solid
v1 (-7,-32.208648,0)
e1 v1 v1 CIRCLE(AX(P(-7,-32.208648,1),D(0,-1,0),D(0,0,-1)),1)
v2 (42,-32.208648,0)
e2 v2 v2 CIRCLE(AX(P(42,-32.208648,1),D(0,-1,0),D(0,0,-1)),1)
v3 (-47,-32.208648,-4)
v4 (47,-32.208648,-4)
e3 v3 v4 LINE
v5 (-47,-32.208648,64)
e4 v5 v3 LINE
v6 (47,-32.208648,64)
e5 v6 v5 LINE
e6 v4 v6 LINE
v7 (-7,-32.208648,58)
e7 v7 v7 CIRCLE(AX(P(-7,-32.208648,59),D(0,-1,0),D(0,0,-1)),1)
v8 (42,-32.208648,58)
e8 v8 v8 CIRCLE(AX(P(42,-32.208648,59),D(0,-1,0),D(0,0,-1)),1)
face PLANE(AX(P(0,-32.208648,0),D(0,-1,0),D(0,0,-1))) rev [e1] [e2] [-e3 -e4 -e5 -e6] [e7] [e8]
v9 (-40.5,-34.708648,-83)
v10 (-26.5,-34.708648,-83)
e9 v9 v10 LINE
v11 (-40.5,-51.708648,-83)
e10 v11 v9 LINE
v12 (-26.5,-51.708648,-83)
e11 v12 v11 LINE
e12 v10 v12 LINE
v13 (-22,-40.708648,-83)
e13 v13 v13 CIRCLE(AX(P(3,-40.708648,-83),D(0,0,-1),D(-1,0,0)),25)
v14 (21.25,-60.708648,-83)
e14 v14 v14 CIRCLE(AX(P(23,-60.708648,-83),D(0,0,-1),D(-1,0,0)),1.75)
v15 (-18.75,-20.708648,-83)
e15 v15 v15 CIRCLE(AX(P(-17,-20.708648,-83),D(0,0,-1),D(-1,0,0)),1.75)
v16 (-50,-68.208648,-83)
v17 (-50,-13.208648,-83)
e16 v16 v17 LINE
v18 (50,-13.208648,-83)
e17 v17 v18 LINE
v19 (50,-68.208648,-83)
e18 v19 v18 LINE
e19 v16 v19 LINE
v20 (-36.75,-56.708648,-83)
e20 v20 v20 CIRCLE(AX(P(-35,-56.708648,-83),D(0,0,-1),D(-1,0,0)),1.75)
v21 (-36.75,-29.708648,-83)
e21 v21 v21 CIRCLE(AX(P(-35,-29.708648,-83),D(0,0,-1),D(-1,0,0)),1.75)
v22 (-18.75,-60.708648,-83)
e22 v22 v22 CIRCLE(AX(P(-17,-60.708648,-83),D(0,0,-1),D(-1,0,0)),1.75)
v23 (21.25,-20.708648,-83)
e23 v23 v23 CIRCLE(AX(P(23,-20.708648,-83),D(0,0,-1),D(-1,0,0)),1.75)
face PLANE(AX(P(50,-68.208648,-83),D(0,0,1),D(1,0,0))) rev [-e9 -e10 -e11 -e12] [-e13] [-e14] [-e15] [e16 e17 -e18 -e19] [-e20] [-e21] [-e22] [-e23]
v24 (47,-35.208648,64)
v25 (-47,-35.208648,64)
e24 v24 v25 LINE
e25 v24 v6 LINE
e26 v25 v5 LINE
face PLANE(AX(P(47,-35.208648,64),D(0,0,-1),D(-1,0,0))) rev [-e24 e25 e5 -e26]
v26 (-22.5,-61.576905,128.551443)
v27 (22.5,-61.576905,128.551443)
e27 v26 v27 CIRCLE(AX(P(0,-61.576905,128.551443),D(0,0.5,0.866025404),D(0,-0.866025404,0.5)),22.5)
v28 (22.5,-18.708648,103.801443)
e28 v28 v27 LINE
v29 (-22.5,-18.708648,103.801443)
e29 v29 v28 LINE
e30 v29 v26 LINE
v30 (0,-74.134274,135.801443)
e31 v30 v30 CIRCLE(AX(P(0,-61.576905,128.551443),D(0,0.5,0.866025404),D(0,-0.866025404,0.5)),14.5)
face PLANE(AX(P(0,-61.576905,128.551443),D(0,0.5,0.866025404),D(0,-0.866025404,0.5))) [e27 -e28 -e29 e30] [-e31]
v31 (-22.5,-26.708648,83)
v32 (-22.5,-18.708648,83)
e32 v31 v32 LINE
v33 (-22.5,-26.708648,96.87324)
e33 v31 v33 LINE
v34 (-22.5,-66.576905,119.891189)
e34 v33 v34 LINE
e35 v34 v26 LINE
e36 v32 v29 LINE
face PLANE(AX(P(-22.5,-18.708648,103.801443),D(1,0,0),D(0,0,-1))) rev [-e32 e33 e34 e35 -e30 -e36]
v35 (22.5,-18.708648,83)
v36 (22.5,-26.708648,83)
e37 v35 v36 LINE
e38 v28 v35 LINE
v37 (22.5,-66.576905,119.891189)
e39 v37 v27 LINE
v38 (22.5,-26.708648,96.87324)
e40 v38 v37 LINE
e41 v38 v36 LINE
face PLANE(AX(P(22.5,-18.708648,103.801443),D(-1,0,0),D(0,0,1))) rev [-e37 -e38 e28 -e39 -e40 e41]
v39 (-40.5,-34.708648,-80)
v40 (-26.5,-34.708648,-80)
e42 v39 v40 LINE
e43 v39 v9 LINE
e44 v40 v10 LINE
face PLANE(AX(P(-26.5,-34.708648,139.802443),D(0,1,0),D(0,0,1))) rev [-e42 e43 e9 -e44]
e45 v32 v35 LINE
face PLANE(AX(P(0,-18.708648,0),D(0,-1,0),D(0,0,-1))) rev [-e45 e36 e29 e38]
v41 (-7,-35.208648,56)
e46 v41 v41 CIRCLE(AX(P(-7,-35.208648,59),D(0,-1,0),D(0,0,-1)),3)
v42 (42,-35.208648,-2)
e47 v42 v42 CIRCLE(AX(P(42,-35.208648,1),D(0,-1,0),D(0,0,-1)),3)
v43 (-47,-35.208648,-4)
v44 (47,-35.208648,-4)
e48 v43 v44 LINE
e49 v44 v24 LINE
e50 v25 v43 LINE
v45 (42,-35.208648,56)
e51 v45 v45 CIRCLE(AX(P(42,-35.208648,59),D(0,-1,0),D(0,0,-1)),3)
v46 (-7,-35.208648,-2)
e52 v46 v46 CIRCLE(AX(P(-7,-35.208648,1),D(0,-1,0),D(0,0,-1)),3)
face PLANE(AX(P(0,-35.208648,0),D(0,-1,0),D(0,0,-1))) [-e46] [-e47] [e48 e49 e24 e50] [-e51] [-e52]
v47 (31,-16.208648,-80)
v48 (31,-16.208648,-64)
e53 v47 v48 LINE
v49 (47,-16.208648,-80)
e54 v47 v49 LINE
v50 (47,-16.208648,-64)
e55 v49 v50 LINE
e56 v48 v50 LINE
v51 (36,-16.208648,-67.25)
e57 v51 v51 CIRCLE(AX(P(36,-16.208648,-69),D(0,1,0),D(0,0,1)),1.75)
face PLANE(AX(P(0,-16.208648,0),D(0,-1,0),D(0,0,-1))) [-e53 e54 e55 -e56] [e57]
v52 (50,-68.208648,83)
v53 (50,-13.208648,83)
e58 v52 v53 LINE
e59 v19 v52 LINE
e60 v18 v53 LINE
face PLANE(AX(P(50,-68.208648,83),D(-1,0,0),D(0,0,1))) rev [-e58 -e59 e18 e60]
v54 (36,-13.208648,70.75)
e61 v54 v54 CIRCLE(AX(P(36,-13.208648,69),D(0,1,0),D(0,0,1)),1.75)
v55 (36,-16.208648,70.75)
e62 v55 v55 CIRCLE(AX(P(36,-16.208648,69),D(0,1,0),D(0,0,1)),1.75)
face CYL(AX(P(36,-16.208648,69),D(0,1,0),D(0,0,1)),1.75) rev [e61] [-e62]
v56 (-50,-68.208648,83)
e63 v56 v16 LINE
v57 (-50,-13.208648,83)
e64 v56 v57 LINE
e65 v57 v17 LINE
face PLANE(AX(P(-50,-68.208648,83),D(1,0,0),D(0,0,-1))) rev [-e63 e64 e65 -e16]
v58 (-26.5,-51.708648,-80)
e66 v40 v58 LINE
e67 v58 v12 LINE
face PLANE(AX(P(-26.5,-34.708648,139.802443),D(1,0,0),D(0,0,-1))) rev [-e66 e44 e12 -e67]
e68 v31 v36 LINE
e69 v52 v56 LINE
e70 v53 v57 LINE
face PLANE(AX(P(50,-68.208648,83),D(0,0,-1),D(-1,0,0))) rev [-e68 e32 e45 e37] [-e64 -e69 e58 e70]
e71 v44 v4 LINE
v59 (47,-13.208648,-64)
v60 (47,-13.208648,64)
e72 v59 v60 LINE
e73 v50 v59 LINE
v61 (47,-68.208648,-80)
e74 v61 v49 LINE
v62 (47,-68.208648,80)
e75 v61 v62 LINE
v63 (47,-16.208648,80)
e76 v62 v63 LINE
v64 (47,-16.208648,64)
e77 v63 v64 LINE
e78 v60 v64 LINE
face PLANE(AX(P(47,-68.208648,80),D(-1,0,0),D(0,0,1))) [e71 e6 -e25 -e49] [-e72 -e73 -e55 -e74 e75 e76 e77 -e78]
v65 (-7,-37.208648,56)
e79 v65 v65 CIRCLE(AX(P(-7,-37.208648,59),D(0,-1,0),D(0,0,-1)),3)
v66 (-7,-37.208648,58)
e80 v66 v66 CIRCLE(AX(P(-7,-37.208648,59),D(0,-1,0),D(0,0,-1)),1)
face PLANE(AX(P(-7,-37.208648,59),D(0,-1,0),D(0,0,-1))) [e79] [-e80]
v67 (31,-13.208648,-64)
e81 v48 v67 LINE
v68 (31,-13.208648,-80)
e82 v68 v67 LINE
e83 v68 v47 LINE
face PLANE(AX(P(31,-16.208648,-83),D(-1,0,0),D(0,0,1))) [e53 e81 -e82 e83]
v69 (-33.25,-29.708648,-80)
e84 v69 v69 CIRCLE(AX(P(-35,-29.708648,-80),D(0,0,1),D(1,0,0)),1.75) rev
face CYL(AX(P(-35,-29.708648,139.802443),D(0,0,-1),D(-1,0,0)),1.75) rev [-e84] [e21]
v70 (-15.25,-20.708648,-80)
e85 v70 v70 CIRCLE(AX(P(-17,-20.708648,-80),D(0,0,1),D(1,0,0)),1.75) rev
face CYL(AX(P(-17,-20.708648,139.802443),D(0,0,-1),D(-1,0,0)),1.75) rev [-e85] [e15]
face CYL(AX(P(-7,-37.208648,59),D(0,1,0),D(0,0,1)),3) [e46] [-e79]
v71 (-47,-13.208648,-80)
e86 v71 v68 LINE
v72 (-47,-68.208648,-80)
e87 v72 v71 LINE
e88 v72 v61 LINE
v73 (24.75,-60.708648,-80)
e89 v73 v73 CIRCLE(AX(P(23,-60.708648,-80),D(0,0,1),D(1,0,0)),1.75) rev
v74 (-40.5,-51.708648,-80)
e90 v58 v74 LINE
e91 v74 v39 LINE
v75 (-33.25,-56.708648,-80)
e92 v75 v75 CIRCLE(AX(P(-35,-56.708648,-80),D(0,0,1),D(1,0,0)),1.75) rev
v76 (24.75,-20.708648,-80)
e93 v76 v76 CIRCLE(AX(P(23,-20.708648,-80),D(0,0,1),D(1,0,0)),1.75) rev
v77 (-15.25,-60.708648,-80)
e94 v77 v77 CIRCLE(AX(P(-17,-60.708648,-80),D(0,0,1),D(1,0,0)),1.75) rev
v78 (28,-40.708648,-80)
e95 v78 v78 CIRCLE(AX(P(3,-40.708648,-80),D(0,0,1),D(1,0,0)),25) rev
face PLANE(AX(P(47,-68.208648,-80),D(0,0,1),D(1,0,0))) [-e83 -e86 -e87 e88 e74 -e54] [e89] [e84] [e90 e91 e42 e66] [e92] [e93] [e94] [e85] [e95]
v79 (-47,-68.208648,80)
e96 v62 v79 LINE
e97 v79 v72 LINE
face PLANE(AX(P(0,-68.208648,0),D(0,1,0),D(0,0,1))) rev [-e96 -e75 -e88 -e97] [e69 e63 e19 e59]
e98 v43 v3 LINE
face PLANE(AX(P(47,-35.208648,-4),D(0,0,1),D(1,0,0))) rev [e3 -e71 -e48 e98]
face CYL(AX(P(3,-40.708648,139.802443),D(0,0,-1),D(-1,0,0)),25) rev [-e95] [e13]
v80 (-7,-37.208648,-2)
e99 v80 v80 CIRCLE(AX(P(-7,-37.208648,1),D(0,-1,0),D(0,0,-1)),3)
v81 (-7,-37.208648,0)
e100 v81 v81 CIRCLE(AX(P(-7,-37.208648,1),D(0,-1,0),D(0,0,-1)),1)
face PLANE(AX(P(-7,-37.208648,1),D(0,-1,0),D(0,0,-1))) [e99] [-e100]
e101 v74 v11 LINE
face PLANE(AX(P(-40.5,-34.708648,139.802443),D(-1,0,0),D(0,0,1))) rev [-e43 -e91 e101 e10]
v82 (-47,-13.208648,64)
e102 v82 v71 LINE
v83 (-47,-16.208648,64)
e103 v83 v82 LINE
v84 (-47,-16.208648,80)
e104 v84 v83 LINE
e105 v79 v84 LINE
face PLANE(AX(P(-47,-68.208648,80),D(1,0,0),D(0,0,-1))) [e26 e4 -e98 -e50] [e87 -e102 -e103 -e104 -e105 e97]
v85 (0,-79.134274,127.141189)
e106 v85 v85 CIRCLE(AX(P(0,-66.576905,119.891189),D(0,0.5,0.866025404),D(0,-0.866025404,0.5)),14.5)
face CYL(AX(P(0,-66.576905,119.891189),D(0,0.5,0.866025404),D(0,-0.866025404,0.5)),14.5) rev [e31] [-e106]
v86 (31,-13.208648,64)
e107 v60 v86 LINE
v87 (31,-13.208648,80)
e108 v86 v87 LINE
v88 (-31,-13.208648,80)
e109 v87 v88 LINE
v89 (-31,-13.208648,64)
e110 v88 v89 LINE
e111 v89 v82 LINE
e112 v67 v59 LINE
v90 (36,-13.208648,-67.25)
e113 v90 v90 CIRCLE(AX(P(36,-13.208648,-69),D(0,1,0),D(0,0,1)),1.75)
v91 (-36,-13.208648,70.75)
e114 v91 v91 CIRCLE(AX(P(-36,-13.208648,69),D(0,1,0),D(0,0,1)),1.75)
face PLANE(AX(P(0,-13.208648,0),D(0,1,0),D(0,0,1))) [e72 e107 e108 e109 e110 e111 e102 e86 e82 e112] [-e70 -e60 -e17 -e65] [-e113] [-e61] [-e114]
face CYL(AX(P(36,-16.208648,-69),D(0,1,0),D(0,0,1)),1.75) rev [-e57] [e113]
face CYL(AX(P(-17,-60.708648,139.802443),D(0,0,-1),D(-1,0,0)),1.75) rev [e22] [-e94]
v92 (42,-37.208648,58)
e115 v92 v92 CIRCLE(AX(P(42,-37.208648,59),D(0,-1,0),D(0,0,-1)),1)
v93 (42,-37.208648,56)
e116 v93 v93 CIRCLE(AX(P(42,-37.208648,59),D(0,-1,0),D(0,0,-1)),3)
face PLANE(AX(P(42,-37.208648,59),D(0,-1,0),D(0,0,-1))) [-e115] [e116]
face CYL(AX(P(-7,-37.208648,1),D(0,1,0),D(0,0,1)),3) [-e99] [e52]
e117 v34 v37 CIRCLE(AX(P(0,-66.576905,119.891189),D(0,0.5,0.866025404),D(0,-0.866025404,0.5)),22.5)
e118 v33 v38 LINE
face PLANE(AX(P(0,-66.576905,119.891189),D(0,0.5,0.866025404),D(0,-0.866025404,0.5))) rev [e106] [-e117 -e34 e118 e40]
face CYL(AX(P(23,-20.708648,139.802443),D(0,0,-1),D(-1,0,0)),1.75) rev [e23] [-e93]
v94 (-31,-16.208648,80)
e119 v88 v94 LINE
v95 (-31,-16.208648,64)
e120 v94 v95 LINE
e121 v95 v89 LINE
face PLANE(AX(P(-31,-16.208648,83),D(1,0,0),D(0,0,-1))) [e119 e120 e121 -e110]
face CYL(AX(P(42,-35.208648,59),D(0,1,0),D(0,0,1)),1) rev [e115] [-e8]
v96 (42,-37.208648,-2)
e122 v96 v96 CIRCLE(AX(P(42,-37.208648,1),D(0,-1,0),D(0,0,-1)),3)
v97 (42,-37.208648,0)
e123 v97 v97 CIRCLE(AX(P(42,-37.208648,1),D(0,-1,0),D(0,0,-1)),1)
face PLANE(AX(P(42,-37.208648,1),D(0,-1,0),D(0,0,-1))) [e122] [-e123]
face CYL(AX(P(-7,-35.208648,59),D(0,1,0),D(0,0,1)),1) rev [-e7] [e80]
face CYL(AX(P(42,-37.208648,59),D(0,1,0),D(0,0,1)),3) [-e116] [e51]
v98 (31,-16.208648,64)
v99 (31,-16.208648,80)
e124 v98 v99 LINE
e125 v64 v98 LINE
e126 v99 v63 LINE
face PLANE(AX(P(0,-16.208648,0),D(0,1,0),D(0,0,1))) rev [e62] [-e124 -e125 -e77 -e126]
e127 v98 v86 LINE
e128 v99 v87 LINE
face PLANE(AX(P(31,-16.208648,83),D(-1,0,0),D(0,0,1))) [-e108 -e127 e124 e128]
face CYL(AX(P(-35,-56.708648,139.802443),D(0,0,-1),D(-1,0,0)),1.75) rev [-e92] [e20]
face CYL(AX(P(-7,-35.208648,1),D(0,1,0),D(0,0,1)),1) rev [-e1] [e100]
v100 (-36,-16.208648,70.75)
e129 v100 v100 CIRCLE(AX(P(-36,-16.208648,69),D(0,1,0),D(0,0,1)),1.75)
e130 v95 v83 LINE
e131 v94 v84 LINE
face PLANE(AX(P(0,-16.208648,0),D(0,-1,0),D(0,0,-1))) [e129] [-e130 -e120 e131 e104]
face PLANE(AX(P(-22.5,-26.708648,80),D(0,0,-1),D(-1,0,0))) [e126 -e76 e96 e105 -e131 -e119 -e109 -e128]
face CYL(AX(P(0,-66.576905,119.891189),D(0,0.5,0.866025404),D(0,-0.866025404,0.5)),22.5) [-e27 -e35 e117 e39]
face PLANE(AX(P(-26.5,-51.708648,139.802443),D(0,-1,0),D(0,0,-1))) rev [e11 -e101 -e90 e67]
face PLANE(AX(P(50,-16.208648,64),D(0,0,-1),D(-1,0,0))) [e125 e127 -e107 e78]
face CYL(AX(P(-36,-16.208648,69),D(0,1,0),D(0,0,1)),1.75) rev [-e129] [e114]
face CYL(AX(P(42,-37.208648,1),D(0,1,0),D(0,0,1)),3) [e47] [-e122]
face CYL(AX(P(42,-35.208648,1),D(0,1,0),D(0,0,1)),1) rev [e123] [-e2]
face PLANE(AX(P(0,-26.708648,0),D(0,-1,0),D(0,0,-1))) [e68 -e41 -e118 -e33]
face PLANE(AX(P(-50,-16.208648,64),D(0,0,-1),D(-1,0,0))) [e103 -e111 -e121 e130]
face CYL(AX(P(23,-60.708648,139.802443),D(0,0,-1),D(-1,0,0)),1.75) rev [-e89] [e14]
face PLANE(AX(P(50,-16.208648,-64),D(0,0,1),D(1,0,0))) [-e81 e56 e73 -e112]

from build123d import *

# Parameters (mm, degrees)
SKETCH2_R                      = 22.5
SKETCH2_R_2                    = 14.5
USB_CHARGE_DEVICE_RING_DEPTH   = 10
RING_START                     = 70.540362552
RING_COMPLETION_DEPTH          = 10
SKETCH4_W                      = 45
SKETCH4_H                      = 23.80144284
LINK_TO_UNIT_CHASSIS_DEPTH     = 8
SKETCH5_W                      = 100
SKETCH5_H                      = 166
SKETCH5_W_2                    = 94
SKETCH5_H_2                    = 160
CHASSIS_WALLS_DEPTH            = 55
SKETCH6_W                      = 19
SKETCH6_H                      = 19
SKETCH6_R                      = 1.75
DISPLAY_FRAME_MOUNT_TABS_DEPTH = 3
SKETCH7_W                      = 94
SKETCH7_H                      = 68
SKETCH7_R                      = 1
RPI_MOUNT_SURFACE_DEPTH        = 3
SKETCH8_R                      = 3
SKETCH8_R_2                    = 1
RPI_MOUNT_BOSSES_DEPTH         = 2
F_50MM_FAN_HOLES_REACH         = 246.023
SKETCH9_R                      = 1.75
SKETCH9_R_2                    = 25
RJ45_CUTOUT_REACH              = 246.023
SKETCH10_R                     = 1.75
SKETCH10_W                     = 14
SKETCH10_H                     = 17


# Read off the part's stored shape, not the designer's step: RING COMPLETION
with BuildPart() as part:
    # Sketch2 → USB CHARGE DEVICE RING (new body)
    with BuildSketch(Plane(origin=(0, 40.270181276, 69.75), x_dir=(1, 0, 0), z_dir=(0, 0.500000000000001, 0.866025403784438))):
        with Locations(Location((0, -117.602885683, 0), (0, 0, 270))):
            Circle(SKETCH2_R)
        with Locations(Location((0, -117.602885683, 0), (0, 0, 270))):
            Circle(SKETCH2_R_2, mode=Mode.SUBTRACT)
    extrude(amount=-USB_CHARGE_DEVICE_RING_DEPTH)

    # RING COMPLETION outline → RING COMPLETION (add)
    with BuildSketch(Plane(origin=(0, 0, 0), x_dir=(1, 0, 0), z_dir=(0, 0.500000000000001, 0.866025403784438)).offset(RING_START)):
        with BuildLine():
            Line((-22.5, -68.102885683), (-22.5, -117.602885683))
            ThreePointArc((-22.5, -117.602885683), (0, -95.102885683), (22.5, -117.602885683))
            Line((22.5, -117.602885683), (22.5, -68.102885683))
            Line((22.5, -68.102885683), (-22.5, -68.102885683))
        make_face()
    extrude(amount=RING_COMPLETION_DEPTH)

    # Sketch4 → LINK TO UNIT CHASSIS (add)
    with BuildSketch(Plane(origin=(0, -18.708647797, 0), x_dir=(1, 0, 0), z_dir=(0, 1, 0))):
        with Locations((0, -91.900721421)):
            Rectangle(SKETCH4_W, SKETCH4_H)
    extrude(amount=-LINK_TO_UNIT_CHASSIS_DEPTH)

    # Sketch5 → CHASSIS WALLS (add)
    with BuildSketch(Plane(origin=(0, -13.208647797, 0), x_dir=(-1, 0, 0), z_dir=(0, -1, 0))):
        Rectangle(SKETCH5_W, SKETCH5_H)
        Rectangle(SKETCH5_W_2, SKETCH5_H_2, mode=Mode.SUBTRACT)
    extrude(amount=CHASSIS_WALLS_DEPTH)

    # Sketch6 → DISPLAY FRAME MOUNT TABS (add)
    # profile 1 of 3: a face of its own
    with BuildSketch(Plane(origin=(0, -13.208647797, 0), x_dir=(1, 0, 0), z_dir=(0, 1, 0))):
        with Locations((-40.5, -73.5)):
            Rectangle(SKETCH6_W, SKETCH6_H)
        with Locations(Location((-36, -69, 0), (0, 0, 270))):
            Circle(SKETCH6_R, mode=Mode.SUBTRACT)
    # profile 2 of 3: a face of its own
    with BuildSketch(Plane(origin=(0, -13.208647797, 0), x_dir=(1, 0, 0), z_dir=(0, 1, 0))):
        with Locations((40.5, -73.5)):
            Rectangle(SKETCH6_W, SKETCH6_H)
        with Locations(Location((36, -69, 0), (0, 0, 270))):
            Circle(SKETCH6_R, mode=Mode.SUBTRACT)
    # profile 3 of 3: a face of its own
    with BuildSketch(Plane(origin=(0, -13.208647797, 0), x_dir=(1, 0, 0), z_dir=(0, 1, 0))):
        with Locations((40.5, 73.5)):
            Rectangle(SKETCH6_W, SKETCH6_H)
        with Locations(Location((36, 69, 0), (0, 0, 270))):
            Circle(SKETCH6_R, mode=Mode.SUBTRACT)
    extrude(amount=-DISPLAY_FRAME_MOUNT_TABS_DEPTH)

    # Sketch7 → RPI MOUNT SURFACE (add)
    with BuildSketch(Plane(origin=(0, -32.208647797, 0), x_dir=(-1, 0, 0), z_dir=(0, -1, 0))):
        with Locations((0, -30.000000001)):
            Rectangle(SKETCH7_W, SKETCH7_H)
        with Locations(Location((7, -1.000000001, 0), (0, 0, 90))):
            Circle(SKETCH7_R, mode=Mode.SUBTRACT)
        with Locations(Location((-42, -1.000000001, 0), (0, 0, 90))):
            Circle(SKETCH7_R, mode=Mode.SUBTRACT)
        with Locations(Location((7, -59.000000001, 0), (0, 0, 90))):
            Circle(SKETCH7_R, mode=Mode.SUBTRACT)
        with Locations(Location((-42, -59.000000001, 0), (0, 0, 90))):
            Circle(SKETCH7_R, mode=Mode.SUBTRACT)
    extrude(amount=RPI_MOUNT_SURFACE_DEPTH)

    # Sketch8 → RPI MOUNT BOSSES (add)
    # profile 1 of 4: a face of its own
    with BuildSketch(Plane.XZ.offset(35.208647797)):
        with Locations(Location((42, 59.000000001, 0), (0, 0, 270))):
            Circle(SKETCH8_R)
        with Locations(Location((42, 59.000000001, 0), (0, 0, 270))):
            Circle(SKETCH8_R_2, mode=Mode.SUBTRACT)
    # profile 2 of 4: a face of its own
    with BuildSketch(Plane.XZ.offset(35.208647797)):
        with Locations(Location((42, 1.000000001, 0), (0, 0, 270))):
            Circle(SKETCH8_R)
        with Locations(Location((42, 1.000000001, 0), (0, 0, 270))):
            Circle(SKETCH8_R_2, mode=Mode.SUBTRACT)
    # profile 3 of 4: a face of its own
    with BuildSketch(Plane.XZ.offset(35.208647797)):
        with Locations(Location((-7, 1.000000001, 0), (0, 0, 270))):
            Circle(SKETCH8_R)
        with Locations(Location((-7, 1.000000001, 0), (0, 0, 270))):
            Circle(SKETCH8_R_2, mode=Mode.SUBTRACT)
    # profile 4 of 4: a face of its own
    with BuildSketch(Plane.XZ.offset(35.208647797)):
        with Locations(Location((-7, 59.000000001, 0), (0, 0, 270))):
            Circle(SKETCH8_R)
        with Locations(Location((-7, 59.000000001, 0), (0, 0, 270))):
            Circle(SKETCH8_R_2, mode=Mode.SUBTRACT)
    extrude(amount=RPI_MOUNT_BOSSES_DEPTH)

    # Sketch9 → 50MM FAN HOLES (cut, up to next)
    with BuildSketch(Plane(origin=(0, 0, -83), x_dir=(-1, 0, 0), z_dir=(0, 0, -1)), mode=Mode.PRIVATE) as f_50mm_fan_holes_sk1:
        with Locations((-23, -20.708647797)):
            Circle(SKETCH9_R)
    f_50mm_fan_holes_tool1 = extrude(f_50mm_fan_holes_sk1.sketch, amount=-F_50MM_FAN_HOLES_REACH, mode=Mode.PRIVATE) & part.part
    # Sketch9 → 50MM FAN HOLES (cut, up to next)
    with BuildSketch(Plane(origin=(0, 0, -83), x_dir=(-1, 0, 0), z_dir=(0, 0, -1)), mode=Mode.PRIVATE) as f_50mm_fan_holes_sk2:
        with Locations((17, -20.708647797)):
            Circle(SKETCH9_R)
    f_50mm_fan_holes_tool2 = extrude(f_50mm_fan_holes_sk2.sketch, amount=-F_50MM_FAN_HOLES_REACH, mode=Mode.PRIVATE) & part.part
    # Sketch9 → 50MM FAN HOLES (cut, up to next)
    with BuildSketch(Plane(origin=(0, 0, -83), x_dir=(-1, 0, 0), z_dir=(0, 0, -1)), mode=Mode.PRIVATE) as f_50mm_fan_holes_sk3:
        with Locations((17, -60.708647797)):
            Circle(SKETCH9_R)
    f_50mm_fan_holes_tool3 = extrude(f_50mm_fan_holes_sk3.sketch, amount=-F_50MM_FAN_HOLES_REACH, mode=Mode.PRIVATE) & part.part
    # Sketch9 → 50MM FAN HOLES (cut, up to next)
    with BuildSketch(Plane(origin=(0, 0, -83), x_dir=(-1, 0, 0), z_dir=(0, 0, -1)), mode=Mode.PRIVATE) as f_50mm_fan_holes_sk4:
        with Locations((-23, -60.708647797)):
            Circle(SKETCH9_R)
    f_50mm_fan_holes_tool4 = extrude(f_50mm_fan_holes_sk4.sketch, amount=-F_50MM_FAN_HOLES_REACH, mode=Mode.PRIVATE) & part.part
    # Sketch9 → 50MM FAN HOLES (cut, up to next)
    with BuildSketch(Plane(origin=(0, 0, -83), x_dir=(-1, 0, 0), z_dir=(0, 0, -1)), mode=Mode.PRIVATE) as f_50mm_fan_holes_sk5:
        with Locations((-3, -40.708647797)):
            Circle(SKETCH9_R_2)
    f_50mm_fan_holes_tool5 = extrude(f_50mm_fan_holes_sk5.sketch, amount=-F_50MM_FAN_HOLES_REACH, mode=Mode.PRIVATE) & part.part
    add(f_50mm_fan_holes_tool1.solids().sort_by_distance((23, -20.708648, -83))[0], mode=Mode.SUBTRACT)
    add(f_50mm_fan_holes_tool2.solids().sort_by_distance((-17, -20.708648, -83))[0], mode=Mode.SUBTRACT)
    add(f_50mm_fan_holes_tool3.solids().sort_by_distance((-17, -60.708648, -83))[0], mode=Mode.SUBTRACT)
    add(f_50mm_fan_holes_tool4.solids().sort_by_distance((23, -60.708648, -83))[0], mode=Mode.SUBTRACT)
    add(f_50mm_fan_holes_tool5.solids().sort_by_distance((3, -40.708648, -83))[0], mode=Mode.SUBTRACT)

    # Sketch10 → RJ45 CUTOUT (cut, up to next)
    with BuildSketch(Plane(origin=(0, 0, -83), x_dir=(-1, 0, 0), z_dir=(0, 0, -1)), mode=Mode.PRIVATE) as rj45_cutout_sk1:
        with Locations((35, -29.708647797)):
            Circle(SKETCH10_R)
    rj45_cutout_tool1 = extrude(rj45_cutout_sk1.sketch, amount=-RJ45_CUTOUT_REACH, mode=Mode.PRIVATE) & part.part
    # Sketch10 → RJ45 CUTOUT (cut, up to next)
    with BuildSketch(Plane(origin=(0, 0, -83), x_dir=(-1, 0, 0), z_dir=(0, 0, -1)), mode=Mode.PRIVATE) as rj45_cutout_sk2:
        with Locations((35, -56.708647797)):
            Circle(SKETCH10_R)
    rj45_cutout_tool2 = extrude(rj45_cutout_sk2.sketch, amount=-RJ45_CUTOUT_REACH, mode=Mode.PRIVATE) & part.part
    # Sketch10 → RJ45 CUTOUT (cut, up to next)
    with BuildSketch(Plane(origin=(0, 0, -83), x_dir=(-1, 0, 0), z_dir=(0, 0, -1)), mode=Mode.PRIVATE) as rj45_cutout_sk3:
        with Locations((33.5, -43.208647797)):
            Rectangle(SKETCH10_W, SKETCH10_H)
    rj45_cutout_tool3 = extrude(rj45_cutout_sk3.sketch, amount=-RJ45_CUTOUT_REACH, mode=Mode.PRIVATE) & part.part
    add(rj45_cutout_tool1.solids().sort_by_distance((-35, -29.708648, -83))[0], mode=Mode.SUBTRACT)
    add(rj45_cutout_tool2.solids().sort_by_distance((-35, -56.708648, -83))[0], mode=Mode.SUBTRACT)
    add(rj45_cutout_tool3.solids().sort_by_distance((-33.5, -43.208648, -83))[0], mode=Mode.SUBTRACT)


solid = part.part
